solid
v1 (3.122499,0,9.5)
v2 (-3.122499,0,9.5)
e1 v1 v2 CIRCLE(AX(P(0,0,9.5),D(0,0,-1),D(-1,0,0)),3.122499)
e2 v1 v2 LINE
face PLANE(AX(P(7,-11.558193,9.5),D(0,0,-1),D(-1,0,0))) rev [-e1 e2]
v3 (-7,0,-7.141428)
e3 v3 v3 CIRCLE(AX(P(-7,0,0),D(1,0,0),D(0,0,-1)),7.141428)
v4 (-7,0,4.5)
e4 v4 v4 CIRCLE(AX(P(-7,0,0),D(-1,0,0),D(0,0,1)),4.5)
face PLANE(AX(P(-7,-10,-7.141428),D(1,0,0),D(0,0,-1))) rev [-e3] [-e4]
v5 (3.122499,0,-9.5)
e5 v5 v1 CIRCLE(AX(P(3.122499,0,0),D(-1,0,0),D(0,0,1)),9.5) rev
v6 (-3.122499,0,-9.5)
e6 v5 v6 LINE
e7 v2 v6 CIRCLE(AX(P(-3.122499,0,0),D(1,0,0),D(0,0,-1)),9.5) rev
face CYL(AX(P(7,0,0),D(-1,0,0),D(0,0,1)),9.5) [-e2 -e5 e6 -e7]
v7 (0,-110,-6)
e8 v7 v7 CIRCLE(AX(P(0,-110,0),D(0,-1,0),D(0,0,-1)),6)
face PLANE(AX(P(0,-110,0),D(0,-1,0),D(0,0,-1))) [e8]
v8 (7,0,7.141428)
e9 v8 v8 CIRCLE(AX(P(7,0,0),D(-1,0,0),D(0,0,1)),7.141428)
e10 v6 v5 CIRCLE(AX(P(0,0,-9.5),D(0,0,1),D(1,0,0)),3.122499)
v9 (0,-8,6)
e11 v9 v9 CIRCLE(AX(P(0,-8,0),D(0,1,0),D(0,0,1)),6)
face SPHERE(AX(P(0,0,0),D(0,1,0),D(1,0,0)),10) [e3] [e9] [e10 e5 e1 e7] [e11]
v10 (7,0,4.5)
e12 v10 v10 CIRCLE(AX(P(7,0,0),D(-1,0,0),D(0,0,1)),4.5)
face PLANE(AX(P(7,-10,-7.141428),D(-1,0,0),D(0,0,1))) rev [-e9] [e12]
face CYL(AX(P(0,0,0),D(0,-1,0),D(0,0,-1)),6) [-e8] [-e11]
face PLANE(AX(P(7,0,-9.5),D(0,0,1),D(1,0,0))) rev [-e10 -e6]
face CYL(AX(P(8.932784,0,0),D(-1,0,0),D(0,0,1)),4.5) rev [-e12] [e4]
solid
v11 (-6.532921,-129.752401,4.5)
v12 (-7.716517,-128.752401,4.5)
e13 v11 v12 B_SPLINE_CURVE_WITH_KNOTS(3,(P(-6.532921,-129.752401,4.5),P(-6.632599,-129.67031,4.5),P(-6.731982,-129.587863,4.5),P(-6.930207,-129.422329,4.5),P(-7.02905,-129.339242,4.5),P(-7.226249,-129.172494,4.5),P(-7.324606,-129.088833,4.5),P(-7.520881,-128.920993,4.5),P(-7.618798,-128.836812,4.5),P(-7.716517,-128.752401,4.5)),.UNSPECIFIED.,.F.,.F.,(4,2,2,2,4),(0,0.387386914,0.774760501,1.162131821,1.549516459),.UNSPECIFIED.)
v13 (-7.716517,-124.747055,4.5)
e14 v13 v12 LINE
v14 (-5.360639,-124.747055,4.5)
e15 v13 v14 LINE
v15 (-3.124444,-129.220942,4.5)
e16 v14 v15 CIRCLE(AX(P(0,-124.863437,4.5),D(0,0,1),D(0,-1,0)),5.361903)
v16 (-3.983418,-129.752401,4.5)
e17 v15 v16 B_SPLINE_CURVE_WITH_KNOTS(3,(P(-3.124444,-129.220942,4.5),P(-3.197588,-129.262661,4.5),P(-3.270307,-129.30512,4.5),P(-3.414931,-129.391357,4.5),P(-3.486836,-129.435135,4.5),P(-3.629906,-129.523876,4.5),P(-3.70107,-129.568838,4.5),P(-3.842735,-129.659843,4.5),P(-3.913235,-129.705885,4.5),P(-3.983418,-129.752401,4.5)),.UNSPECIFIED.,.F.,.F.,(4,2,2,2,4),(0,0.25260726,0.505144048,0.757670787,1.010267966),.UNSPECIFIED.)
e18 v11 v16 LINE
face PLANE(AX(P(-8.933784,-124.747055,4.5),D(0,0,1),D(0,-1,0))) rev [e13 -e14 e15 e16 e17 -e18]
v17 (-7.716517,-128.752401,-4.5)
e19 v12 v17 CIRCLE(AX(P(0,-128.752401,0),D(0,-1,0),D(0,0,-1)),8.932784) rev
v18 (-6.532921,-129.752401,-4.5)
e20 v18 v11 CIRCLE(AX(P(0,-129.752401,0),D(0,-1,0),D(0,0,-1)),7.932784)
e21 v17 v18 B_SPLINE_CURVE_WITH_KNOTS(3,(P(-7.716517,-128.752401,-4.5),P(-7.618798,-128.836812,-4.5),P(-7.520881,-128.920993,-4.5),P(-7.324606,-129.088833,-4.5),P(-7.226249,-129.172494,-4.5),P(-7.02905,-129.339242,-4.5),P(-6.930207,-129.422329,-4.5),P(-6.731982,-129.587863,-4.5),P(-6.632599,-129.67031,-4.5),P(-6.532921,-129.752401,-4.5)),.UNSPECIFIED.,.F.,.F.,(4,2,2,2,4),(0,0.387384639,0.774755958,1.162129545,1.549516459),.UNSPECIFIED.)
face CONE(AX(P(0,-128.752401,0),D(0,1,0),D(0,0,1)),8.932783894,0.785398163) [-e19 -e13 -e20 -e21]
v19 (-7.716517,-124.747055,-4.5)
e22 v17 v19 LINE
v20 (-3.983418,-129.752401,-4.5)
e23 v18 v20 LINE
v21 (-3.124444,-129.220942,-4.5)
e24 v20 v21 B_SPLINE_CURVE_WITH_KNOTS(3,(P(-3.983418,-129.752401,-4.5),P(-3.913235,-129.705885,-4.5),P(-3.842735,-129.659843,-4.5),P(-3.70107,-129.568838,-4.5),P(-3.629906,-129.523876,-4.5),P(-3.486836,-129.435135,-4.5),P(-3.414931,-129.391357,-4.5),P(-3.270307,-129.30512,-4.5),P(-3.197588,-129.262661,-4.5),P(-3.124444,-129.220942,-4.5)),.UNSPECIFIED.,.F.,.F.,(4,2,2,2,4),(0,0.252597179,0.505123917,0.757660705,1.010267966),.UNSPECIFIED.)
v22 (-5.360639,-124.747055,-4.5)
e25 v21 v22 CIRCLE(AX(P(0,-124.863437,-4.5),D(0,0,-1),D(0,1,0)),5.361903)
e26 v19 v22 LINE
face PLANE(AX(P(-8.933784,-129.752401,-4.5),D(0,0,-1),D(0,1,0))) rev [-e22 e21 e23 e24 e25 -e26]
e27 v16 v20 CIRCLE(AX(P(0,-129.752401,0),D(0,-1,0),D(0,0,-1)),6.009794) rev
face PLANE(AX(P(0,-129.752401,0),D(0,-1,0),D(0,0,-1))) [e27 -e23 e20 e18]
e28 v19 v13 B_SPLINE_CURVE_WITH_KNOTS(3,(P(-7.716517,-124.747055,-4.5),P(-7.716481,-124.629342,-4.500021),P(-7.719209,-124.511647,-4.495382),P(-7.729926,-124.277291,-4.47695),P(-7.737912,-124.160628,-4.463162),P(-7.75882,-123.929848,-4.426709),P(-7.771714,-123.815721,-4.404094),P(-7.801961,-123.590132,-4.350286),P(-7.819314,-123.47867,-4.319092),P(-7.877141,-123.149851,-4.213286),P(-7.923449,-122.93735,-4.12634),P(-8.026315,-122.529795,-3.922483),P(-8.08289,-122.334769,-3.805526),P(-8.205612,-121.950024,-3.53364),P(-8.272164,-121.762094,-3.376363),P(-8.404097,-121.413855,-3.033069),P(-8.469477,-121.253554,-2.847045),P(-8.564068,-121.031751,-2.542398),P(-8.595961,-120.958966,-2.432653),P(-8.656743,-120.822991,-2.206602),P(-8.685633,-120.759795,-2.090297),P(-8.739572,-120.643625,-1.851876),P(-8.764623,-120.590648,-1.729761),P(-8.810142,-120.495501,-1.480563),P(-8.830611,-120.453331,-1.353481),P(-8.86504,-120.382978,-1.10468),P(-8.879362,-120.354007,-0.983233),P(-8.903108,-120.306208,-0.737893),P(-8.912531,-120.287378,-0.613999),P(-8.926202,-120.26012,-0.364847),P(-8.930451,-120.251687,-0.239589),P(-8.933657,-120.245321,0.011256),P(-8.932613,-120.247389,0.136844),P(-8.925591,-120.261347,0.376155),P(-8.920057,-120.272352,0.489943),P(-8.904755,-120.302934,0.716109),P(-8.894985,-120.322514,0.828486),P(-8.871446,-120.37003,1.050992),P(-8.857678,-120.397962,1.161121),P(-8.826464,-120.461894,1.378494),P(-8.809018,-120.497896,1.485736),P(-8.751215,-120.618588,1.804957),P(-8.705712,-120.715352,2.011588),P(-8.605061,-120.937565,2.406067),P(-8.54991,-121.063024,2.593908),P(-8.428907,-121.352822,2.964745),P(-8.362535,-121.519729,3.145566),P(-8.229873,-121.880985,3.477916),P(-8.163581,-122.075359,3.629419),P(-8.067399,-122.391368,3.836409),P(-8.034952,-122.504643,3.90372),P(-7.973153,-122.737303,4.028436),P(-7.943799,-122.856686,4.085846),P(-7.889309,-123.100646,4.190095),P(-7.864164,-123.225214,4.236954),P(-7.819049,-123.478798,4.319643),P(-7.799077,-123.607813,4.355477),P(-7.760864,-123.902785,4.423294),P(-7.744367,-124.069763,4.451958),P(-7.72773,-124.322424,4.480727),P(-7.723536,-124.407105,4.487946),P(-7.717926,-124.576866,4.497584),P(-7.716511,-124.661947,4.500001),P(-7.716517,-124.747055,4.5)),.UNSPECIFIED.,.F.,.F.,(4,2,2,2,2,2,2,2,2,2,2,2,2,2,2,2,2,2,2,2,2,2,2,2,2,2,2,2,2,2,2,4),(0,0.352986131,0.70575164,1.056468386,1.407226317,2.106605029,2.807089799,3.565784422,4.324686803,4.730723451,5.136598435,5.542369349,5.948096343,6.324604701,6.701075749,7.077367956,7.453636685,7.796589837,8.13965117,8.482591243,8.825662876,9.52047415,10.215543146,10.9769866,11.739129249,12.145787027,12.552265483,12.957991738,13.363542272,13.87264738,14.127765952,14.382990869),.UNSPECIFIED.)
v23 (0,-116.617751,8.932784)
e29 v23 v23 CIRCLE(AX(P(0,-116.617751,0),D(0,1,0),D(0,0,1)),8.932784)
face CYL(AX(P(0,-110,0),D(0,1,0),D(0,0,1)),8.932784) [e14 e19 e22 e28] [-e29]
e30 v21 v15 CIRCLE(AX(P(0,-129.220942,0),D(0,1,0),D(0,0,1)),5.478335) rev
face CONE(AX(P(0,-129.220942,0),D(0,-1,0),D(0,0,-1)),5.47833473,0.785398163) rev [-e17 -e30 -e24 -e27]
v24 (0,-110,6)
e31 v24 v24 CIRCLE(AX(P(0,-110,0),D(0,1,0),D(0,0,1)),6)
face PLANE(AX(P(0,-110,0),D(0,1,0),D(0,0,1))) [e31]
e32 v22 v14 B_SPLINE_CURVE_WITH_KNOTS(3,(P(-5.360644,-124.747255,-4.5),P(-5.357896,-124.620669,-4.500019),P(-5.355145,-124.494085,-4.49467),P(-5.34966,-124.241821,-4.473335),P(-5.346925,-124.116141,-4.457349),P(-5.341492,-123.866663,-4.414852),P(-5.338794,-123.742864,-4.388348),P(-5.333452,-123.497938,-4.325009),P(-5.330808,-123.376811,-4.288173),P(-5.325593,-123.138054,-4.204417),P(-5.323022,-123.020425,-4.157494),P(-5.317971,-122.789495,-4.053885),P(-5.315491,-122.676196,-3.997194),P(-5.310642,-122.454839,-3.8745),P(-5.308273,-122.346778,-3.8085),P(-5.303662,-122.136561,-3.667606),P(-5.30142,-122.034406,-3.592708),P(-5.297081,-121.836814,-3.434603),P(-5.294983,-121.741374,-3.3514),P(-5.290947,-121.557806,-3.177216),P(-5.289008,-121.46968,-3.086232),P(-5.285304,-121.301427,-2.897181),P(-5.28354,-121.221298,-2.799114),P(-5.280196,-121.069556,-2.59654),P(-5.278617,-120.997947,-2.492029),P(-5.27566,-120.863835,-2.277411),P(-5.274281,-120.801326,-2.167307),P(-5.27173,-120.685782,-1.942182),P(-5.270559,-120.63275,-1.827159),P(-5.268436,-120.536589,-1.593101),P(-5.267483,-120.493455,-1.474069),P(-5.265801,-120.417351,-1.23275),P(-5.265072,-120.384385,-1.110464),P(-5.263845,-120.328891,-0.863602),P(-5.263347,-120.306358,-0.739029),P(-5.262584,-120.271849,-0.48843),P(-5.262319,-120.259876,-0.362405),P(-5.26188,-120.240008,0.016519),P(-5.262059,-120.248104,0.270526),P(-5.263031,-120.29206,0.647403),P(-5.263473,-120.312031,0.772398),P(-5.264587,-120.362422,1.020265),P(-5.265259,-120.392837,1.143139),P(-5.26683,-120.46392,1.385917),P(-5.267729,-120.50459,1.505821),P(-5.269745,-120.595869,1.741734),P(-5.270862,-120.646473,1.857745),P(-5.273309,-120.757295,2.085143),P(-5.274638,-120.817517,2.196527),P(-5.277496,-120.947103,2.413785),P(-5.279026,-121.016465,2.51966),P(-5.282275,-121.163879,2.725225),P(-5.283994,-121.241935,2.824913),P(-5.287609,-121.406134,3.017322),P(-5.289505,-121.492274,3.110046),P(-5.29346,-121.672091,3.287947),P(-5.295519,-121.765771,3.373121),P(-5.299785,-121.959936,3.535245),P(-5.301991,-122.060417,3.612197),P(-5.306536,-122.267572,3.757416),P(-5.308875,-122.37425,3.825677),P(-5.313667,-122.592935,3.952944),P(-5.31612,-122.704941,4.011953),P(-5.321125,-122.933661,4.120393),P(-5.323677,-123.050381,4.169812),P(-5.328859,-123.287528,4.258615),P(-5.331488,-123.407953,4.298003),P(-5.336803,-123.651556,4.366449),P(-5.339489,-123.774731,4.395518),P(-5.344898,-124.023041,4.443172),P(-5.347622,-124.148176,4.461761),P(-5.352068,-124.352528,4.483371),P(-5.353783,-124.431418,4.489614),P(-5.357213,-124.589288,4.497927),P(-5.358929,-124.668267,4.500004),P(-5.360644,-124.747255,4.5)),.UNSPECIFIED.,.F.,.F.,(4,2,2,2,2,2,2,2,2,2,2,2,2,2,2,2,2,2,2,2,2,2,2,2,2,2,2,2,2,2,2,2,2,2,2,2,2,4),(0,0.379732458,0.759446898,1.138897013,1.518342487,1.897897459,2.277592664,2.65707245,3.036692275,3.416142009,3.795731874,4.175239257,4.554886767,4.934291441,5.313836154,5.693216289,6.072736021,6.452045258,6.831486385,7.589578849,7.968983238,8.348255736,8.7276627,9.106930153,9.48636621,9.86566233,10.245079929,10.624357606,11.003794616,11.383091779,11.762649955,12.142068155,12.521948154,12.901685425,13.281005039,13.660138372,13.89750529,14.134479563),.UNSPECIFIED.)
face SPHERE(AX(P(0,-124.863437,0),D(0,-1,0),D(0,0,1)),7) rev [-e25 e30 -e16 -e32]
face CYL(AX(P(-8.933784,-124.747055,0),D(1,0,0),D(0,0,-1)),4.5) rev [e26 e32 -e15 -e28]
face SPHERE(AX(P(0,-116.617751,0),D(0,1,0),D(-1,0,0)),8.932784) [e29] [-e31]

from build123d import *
from build123d.topology import SkipClean

# Parameters (mm, degrees)
CUT_EXTRUDE_1_DEPTH      = 25.494897428
CUT_EXTRUDE_2_DEPTH      = 20.899748742
EXTRUDE_4_DEPTH          = 100
EXTRUDE_4_DEPTH_BACK     = 10
SKETCH_5_R               = 6
CUT_EXTRUDE_3_REACH      = 132.406
CUT_EXTRUDE_3_END_RADIUS = 8.932783894
CHAMFER_2_SIZE           = 1
SKETCH_9_R               = 4.5
CUT_EXTRUDE_4_DEPTH      = 132.071694674


with BuildPart() as part:
    # Эскиз1 → Повернуть1 (revolve)
    with BuildSketch(Plane.XY):
        with BuildLine():
            Line((0, 10), (0, -10))
            ThreePointArc((0, -10), (10, 0), (0, 10))
        make_face()
    revolve(axis=Axis((0, 10, 0), (0, -1, 0)))

    # Эскиз3 → Вырез-Вытянуть1 (cut, through all)
    with SkipClean():  # the faces are left unmerged after this step: merging them gives an invalid solid
        with BuildSketch(Plane(origin=(0, 10, 0), x_dir=(1, 0, 0), z_dir=(0, 1, 0))):
            with BuildLine():
                Line((-7, 7.141428429), (-7, -7.141428429))
                ThreePointArc((-7, -7.141428429), (-10, 0), (-7, 7.141428429))
            make_face()
            with BuildLine():
                Line((7, 7.141428429), (7, -7.141428429))
                ThreePointArc((7, -7.141428429), (10, 0), (7, 7.141428429))
            make_face()
        extrude(amount=-CUT_EXTRUDE_1_DEPTH, mode=Mode.SUBTRACT)

    # Эскиз4 → Вырез-Вытянуть2 (cut, through all)
    with SkipClean():  # the faces are left unmerged after this step: merging them gives an invalid solid
        with BuildSketch(Plane.ZY.offset(7)):
            with BuildLine():
                Line((-9.5, 0), (-9.5, -11.558193376))
                Line((-9.5, -11.558193376), (-11.108111605, -11.558193376))
                Line((-11.108111605, -11.558193376), (-11.108111605, 11.628024295))
                Line((-11.108111605, 11.628024295), (11.340171681, 11.628024295))
                Line((11.340171681, 11.628024295), (11.340171681, -11.558193376))
                Line((11.340171681, -11.558193376), (9.5, -11.558193376))
                Line((9.5, -11.558193376), (9.5, 0))
                ThreePointArc((9.5, 0), (0, 9.5), (-9.5, 0))
            make_face()
        extrude(amount=-CUT_EXTRUDE_2_DEPTH, mode=Mode.SUBTRACT)

    # Эскиз5 → Бобышка-Вытянуть4 (add, two sides: drawn at the far end of the back side and taken through both)
    with SkipClean():  # the faces are left unmerged after this step: merging them gives an invalid solid
        with BuildSketch(Plane(origin=(0, -10, 0), x_dir=(-1, 0, 0), z_dir=(0, -1, 0)).offset(-EXTRUDE_4_DEPTH_BACK)):
            with Locations(Location((0, 0, 0), (0, 0, 90))):
                Circle(SKETCH_5_R)
        extrude(amount=EXTRUDE_4_DEPTH + EXTRUDE_4_DEPTH_BACK)

    # Эскиз9 → Вырез-Вытянуть4 (cut, through all)
    with SkipClean():  # the faces are left unmerged after this step: merging them gives an invalid solid
        with BuildSketch(Plane.ZY.offset(7)):
            Circle(SKETCH_9_R)
        extrude(amount=-CUT_EXTRUDE_4_DEPTH, mode=Mode.SUBTRACT)


with BuildPart() as body_2:
    # Эскиз6 → Повернуть2 (revolve)
    with BuildSketch(Plane.XY, mode=Mode.PRIVATE) as revolve_2_sk:
        with BuildLine():
            Line((0, -110), (0, -129.752400891))
            Line((0, -129.752400891), (-8.932783894, -129.752400891))
            Line((-8.932783894, -129.752400891), (-8.932783894, -116.617750985))
            ThreePointArc((-8.932783894, -116.617750985), (-8.166741439, -112.998502117), (-6, -110))
            Line((-6, -110), (0, -110))
        make_face()
    revolve(revolve_2_sk.sketch.rotate(Axis((0, -110, 0), (0, -1, 0)), 270), axis=Axis((0, -110, 0), (0, -1, 0)))

    # Эскиз7 → Вырез-Повернуть1 (revolve, cut)
    with BuildSketch(Plane(origin=(0, 0, 0), x_dir=(0, 0, -1), z_dir=(1, 0, 0))):
        with BuildLine():
            Line((0, -117.863437075), (0, -131.863437075))
            ThreePointArc((0, -131.863437075), (7, -124.863437075), (0, -117.863437075))
        make_face()
    revolve(axis=Axis((0, -129.752400891, 0), (0, 1, 0)), mode=Mode.SUBTRACT)

    # Вырез-Вытянуть3: up to this cylinder (the profile starts inside it)
    cut_extrude_3_end = Plane(origin=(0, -125.423518, 0), z_dir=(0, 1, 0)) * Cylinder(CUT_EXTRUDE_3_END_RADIUS, 283.677567788, mode=Mode.PRIVATE)
    # Эскиз8 → Вырез-Вытянуть3 (cut, up to the surface)
    with BuildSketch(Plane(origin=(0, 0, 0), x_dir=(0, 0, -1), z_dir=(1, 0, 0)), mode=Mode.PRIVATE) as cut_extrude_3_sk1:
        with BuildLine():
            Line((-4.5, -124.747055334), (-4.5, -129.752400891))
            Line((-4.5, -129.752400891), (4.5, -129.752400891))
            Line((4.5, -129.752400891), (4.5, -124.747055334))
            ThreePointArc((4.5, -124.747055334), (0, -120.247055334), (-4.5, -124.747055334))
        make_face()
    cut_extrude_3_tool1 = extrude(cut_extrude_3_sk1.sketch, amount=-CUT_EXTRUDE_3_REACH, mode=Mode.PRIVATE) & cut_extrude_3_end
    add(cut_extrude_3_tool1.solids().sort_by_distance((0, -125.423518, 0))[0], mode=Mode.SUBTRACT)

    # Фаска2
    # the kernel refuses this chamfer: 1, 0.707159459 mm, written as the material it takes off along each edge
    with BuildSketch(Plane(origin=(0, -129.752400891, 0), x_dir=(-0.8245803433521156, 0, 0.5657448694926958), z_dir=(-0.5657448694926958, 0, -0.8245803433521156))) as chamfer_2_piece_1:
        with BuildLine():
            Line((5.009793689 + CHAMFER_2_SIZE, 0), (5.47833473, 0.531458959))
            ThreePointArc((5.47833473, 0.531458959), (5.251626356, 0.260743789), (5.009793689, 0))
            Line((5.009793689, 0), (5.009793689 + CHAMFER_2_SIZE, 0))
        make_face()
    revolve(axis=Axis((0, -129.752400891, 0), (0, 1, 0)), revolution_arc=235.545967623, mode=Mode.SUBTRACT)
    with BuildSketch(Plane(origin=(0, -129.752400891, 0), x_dir=(-0.971519805459464, 0, -0.23695836680734683), z_dir=(-0.23695836680734683, 0, 0.971519805459464))) as chamfer_2_piece_2:
        Polygon((8.932783894, -CHAMFER_2_SIZE), (8.932783894 - CHAMFER_2_SIZE, 0), (8.932783894, 0), align=None)
    revolve(axis=Axis((0, -129.752400891, 0), (0, -1, 0)), revolution_arc=256.292910039, mode=Mode.SUBTRACT)
    with BuildSketch(Plane(origin=(0, -129.752400891, 0), x_dir=(0, 0, 1), z_dir=(1, 0, 0))) as chamfer_2_piece_3:
        Polygon((8.932783894, -CHAMFER_2_SIZE), (8.932783894 - CHAMFER_2_SIZE, 0), (8.932783894, 0), align=None)
    revolve(axis=Axis((0, -129.752400891, 0), (0, -1, 0)), revolution_arc=76.248727648, mode=Mode.SUBTRACT)
    with BuildSketch(Plane(origin=(0, -129.752400891, 0), x_dir=(0, 0, -1), z_dir=(1, 0, 0))) as chamfer_2_piece_4:
        with BuildLine():
            Line((5.009793689 + CHAMFER_2_SIZE, 0), (5.47833473, 0.531458959))
            ThreePointArc((5.47833473, 0.531458959), (5.251626356, 0.260743789), (5.009793689, 0))
            Line((5.009793689, 0), (5.009793689 + CHAMFER_2_SIZE, 0))
        make_face()
    revolve(axis=Axis((0, -129.752400891, 0), (0, 1, 0)), revolution_arc=55.484942969, mode=Mode.SUBTRACT)


solid = Compound([part.part, body_2.part])
